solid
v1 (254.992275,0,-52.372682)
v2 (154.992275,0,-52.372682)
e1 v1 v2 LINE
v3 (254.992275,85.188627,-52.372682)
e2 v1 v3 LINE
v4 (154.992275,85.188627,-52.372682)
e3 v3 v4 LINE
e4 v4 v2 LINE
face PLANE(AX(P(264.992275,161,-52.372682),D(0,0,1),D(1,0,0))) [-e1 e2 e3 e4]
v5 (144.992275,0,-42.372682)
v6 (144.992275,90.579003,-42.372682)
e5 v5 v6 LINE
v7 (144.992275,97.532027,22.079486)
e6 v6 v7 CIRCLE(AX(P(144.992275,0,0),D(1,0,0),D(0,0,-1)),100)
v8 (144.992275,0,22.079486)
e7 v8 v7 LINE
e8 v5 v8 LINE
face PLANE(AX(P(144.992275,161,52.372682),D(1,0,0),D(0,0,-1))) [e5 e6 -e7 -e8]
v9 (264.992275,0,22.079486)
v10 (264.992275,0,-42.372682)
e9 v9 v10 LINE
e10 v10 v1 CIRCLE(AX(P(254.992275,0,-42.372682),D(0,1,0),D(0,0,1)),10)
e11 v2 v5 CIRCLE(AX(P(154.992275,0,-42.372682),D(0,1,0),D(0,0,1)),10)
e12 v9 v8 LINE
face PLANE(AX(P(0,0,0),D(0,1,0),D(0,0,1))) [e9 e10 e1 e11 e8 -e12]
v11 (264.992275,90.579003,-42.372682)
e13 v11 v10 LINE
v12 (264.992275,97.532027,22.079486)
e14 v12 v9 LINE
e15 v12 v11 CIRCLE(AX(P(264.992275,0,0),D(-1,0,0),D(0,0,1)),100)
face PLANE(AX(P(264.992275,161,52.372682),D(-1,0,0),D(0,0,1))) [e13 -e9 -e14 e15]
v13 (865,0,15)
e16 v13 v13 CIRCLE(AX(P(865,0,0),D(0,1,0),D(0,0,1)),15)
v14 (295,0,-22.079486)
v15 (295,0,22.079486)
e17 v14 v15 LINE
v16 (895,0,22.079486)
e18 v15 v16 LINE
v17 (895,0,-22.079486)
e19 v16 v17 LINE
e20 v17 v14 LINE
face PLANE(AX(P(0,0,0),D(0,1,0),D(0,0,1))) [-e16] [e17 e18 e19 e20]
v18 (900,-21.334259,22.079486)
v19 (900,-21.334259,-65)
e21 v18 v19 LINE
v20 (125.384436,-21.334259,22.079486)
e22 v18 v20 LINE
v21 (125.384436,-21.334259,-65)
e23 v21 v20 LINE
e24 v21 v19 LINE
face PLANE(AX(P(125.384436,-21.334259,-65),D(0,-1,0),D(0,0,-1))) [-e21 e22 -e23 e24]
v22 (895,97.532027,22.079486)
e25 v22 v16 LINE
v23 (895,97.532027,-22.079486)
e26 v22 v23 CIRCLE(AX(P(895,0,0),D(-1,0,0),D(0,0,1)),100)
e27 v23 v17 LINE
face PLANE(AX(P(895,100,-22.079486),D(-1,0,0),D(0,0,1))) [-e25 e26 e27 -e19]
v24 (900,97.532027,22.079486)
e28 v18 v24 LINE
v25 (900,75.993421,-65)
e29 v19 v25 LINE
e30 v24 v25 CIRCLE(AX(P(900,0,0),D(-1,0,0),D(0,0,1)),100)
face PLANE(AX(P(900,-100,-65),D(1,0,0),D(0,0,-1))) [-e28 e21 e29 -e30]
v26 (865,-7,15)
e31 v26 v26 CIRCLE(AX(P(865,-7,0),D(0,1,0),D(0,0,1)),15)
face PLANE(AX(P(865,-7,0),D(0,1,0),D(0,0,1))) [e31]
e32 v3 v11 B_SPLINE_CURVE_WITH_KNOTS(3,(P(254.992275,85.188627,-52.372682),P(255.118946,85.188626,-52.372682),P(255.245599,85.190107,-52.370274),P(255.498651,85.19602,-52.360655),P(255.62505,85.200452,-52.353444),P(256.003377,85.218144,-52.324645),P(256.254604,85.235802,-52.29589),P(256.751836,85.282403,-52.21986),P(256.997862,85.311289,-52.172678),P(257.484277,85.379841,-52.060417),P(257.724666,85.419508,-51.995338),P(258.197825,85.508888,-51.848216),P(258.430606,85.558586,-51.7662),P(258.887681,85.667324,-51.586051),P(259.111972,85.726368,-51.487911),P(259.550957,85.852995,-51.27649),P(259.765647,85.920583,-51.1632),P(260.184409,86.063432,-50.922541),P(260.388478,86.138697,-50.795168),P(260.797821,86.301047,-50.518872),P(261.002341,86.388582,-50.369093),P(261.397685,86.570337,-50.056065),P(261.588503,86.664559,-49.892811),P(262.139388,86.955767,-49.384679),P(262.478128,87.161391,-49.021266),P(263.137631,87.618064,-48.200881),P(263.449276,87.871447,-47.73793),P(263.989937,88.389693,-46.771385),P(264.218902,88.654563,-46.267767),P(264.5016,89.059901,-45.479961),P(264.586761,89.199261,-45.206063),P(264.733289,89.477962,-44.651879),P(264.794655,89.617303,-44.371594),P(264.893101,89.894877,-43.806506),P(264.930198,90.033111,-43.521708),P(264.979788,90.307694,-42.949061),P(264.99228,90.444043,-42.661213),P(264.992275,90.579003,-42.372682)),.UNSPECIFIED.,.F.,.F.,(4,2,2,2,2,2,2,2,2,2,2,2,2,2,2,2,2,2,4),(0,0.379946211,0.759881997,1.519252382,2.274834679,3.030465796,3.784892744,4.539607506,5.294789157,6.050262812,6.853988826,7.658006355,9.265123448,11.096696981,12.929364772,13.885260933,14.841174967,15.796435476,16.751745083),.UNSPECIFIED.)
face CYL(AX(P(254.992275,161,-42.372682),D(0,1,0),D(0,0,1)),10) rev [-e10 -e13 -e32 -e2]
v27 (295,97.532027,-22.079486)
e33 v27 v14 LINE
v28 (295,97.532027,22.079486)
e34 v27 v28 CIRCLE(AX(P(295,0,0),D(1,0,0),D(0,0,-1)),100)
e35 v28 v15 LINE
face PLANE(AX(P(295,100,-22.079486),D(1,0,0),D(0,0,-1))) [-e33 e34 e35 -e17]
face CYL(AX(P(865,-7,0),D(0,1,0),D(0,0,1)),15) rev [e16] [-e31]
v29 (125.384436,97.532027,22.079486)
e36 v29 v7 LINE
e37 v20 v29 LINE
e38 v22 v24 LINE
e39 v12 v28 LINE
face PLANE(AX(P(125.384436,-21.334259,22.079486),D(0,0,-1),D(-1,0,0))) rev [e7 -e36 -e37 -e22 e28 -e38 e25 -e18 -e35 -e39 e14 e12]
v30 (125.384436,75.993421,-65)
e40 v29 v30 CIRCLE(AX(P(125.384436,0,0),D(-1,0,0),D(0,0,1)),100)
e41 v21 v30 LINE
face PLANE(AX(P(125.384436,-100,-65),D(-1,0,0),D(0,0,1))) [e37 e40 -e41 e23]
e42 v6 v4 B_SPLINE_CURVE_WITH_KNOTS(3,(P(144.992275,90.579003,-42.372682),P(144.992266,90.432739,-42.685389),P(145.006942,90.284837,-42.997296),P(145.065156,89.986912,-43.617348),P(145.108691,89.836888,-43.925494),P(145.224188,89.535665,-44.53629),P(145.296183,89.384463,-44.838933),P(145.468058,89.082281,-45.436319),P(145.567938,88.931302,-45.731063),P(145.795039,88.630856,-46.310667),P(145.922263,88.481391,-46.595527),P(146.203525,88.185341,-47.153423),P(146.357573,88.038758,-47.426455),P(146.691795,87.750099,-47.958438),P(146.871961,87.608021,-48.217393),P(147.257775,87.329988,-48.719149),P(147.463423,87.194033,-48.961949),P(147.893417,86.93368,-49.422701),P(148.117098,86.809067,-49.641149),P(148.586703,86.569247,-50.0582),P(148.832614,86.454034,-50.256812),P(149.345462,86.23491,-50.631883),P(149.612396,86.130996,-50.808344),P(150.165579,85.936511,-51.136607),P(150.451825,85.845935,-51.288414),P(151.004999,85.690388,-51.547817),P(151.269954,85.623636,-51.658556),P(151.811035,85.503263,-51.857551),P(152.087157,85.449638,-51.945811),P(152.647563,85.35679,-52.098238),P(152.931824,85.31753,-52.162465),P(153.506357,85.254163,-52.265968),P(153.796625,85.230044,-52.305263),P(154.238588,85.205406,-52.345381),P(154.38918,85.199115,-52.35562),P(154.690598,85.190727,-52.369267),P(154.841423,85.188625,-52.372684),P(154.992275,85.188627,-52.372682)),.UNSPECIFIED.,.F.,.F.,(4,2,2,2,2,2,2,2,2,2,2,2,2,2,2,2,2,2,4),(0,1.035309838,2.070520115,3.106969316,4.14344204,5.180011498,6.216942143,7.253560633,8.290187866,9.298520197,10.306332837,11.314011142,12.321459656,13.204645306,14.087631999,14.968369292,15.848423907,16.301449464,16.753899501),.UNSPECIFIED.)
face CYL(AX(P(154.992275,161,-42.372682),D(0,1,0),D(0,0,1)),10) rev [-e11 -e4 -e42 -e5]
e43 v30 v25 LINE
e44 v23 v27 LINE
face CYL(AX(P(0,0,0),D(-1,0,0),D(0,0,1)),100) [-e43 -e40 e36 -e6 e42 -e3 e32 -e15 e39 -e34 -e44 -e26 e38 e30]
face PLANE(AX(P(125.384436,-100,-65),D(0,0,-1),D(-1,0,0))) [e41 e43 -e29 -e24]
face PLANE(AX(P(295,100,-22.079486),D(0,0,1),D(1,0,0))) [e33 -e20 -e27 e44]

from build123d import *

# Parameters (mm, degrees)
CUT_EXTRUDE7_DEPTH               = 1010.950493836
CUT_EXTRUDE7_DEPTH_BACK          = 1010.950493836
SKETCH13_W                       = 48.176434887
SKETCH13_H                       = 155.804640487
SKETCH4_W                        = 600
SKETCH4_H                        = 44.158972604
CUT_EXTRUDE2_DEPTH               = 1010.950493836
SKETCH7_W                        = 159.807953253
SKETCH7_H                        = 69.49104999
BOSS_EXTRUDE7_DEPTH              = 5
FILLET5_R                        = 10
F_5_8_0_625_DIAMETER_HOLE1_D     = 15.875
F_5_8_0_625_DIAMETER_HOLE1_DEPTH = 30
F_5_8_0_625_DIAMETER_HOLE1_TIP   = 4.769331164
BOSS_EXTRUDE8_DEPTH              = 10
BOSS_EXTRUDE8_DEPTH_BACK         = 10
SKETCH16_W                       = 57.403477863
SKETCH16_H                       = 23.203595883
SKETCH17_W                       = 38.256761469
SKETCH17_H                       = 12.64819079
BOSS_EXTRUDE9_DEPTH              = 10
SKETCH18_W                       = 120
SKETCH18_H                       = 104.74536306
CUT_EXTRUDE8_DEPTH               = 161
FILLET6_R                        = 10
SKETCH19_R                       = 15
CUT_EXTRUDE9_DEPTH               = 7
CUT_EXTRUDE11_DEPTH              = 1010.950493856
CUT_EXTRUDE11_DEPTH_BACK         = 1010.950493856
SKETCH22_W                       = 1481.455902665
SKETCH22_H                       = 524.99926461
SKETCH22_W_2                     = 774.615564444
SKETCH22_H_2                     = 130
SKETCH23_W                       = 1033.221047575
SKETCH23_H                       = 313.410359552
SKETCH23_W_2                     = 790.959514037
SKETCH23_H_2                     = 163.499719248
CUT_EXTRUDE12_DEPTH              = 915.822387207
CUT_EXTRUDE13_DEPTH              = 908.868382599
CUT_EXTRUDE13_DEPTH_BACK         = 908.868382599
SKETCH24_W                       = 774.615564444
SKETCH24_H                       = 42.920513698


# Read off the part's stored shape, not the designer's step: Revolve1
with BuildPart() as part:
    # Revolve1 outline → Revolve1 (revolve)
    with BuildSketch(Plane.YX):
        with BuildLine():
            Line((0, 1000), (0, 0))
            ThreePointArc((0, 0), (70.710678154, 29.289321917), (100, 100.0000001))
            Line((100, 100.0000001), (100, 899.9999999))
            ThreePointArc((100, 899.9999999), (70.710678154, 970.710678083), (0, 1000))
        make_face()
    revolve(axis=Axis((0, 0, 0), (1, 0, 0)))

    # Sketch13 → Cut-Extrude7 (cut, two sides: drawn at the far end of the back side and taken through both)
    with BuildSketch(Plane(origin=(0, 0, 0), x_dir=(1, 0, 0), z_dir=(0, 1, 0)).offset(-CUT_EXTRUDE7_DEPTH_BACK)):
        with Locations((5.911782557, -3.075091589)):
            Rectangle(SKETCH13_W, SKETCH13_H)
    extrude(amount=CUT_EXTRUDE7_DEPTH + CUT_EXTRUDE7_DEPTH_BACK, mode=Mode.SUBTRACT)

    # Sketch4 → Cut-Extrude2 (cut, through all)
    with BuildSketch(Plane(origin=(0, 0, 0), x_dir=(1, 0, 0), z_dir=(0, 1, 0))):
        with Locations((595, 0)):
            Rectangle(SKETCH4_W, SKETCH4_H)
    extrude(amount=CUT_EXTRUDE2_DEPTH, mode=Mode.SUBTRACT)

    # Sketch7 → Boss-Extrude7 (add)
    with BuildSketch(Plane(origin=(0, 0, 0), x_dir=(1, 0, 0), z_dir=(0, 1, 0))):
        with Locations((745.885521462, -1.405844332)):
            Rectangle(SKETCH7_W, SKETCH7_H)
    extrude(amount=-BOSS_EXTRUDE7_DEPTH)

    # Fillet5
    fillet5_edges = [part.edges().sort_by_distance(p)[0] for p in [
        (30, -71.414284286, 0),
    ]]
    fillet(fillet5_edges, radius=FILLET5_R)

    # 5/8 (0.625) Diameter Hole1
    with Locations(Plane.ZY.offset(-30)):
        with Locations((0, 0)):
            Hole(F_5_8_0_625_DIAMETER_HOLE1_D / 2, depth=F_5_8_0_625_DIAMETER_HOLE1_DEPTH)
            with Locations((0, 0, -(F_5_8_0_625_DIAMETER_HOLE1_DEPTH + F_5_8_0_625_DIAMETER_HOLE1_TIP / 2))):  # 118° drill point
                Cone(0, F_5_8_0_625_DIAMETER_HOLE1_D / 2, F_5_8_0_625_DIAMETER_HOLE1_TIP, mode=Mode.SUBTRACT)

    # Sketch16 → Boss-Extrude8 (add, two sides: drawn at the far end of the back side and taken through both)
    with BuildSketch(Plane.XY.offset(-BOSS_EXTRUDE8_DEPTH_BACK)):
        with Locations((738.294537666, -11.601797942)):
            Rectangle(SKETCH16_W, SKETCH16_H)
    extrude(amount=BOSS_EXTRUDE8_DEPTH + BOSS_EXTRUDE8_DEPTH_BACK)

    # Sketch17 → Boss-Extrude9 (add)
    with BuildSketch(Plane.XY.offset(-22.079486302)):
        with Locations((787.071835847, 6.324095395)):
            Rectangle(SKETCH17_W, SKETCH17_H)
    extrude(amount=-BOSS_EXTRUDE9_DEPTH)

    # Sketch18 → Cut-Extrude8 (cut)
    with BuildSketch(Plane(origin=(0, 0, 0), x_dir=(1, 0, 0), z_dir=(0, 1, 0))):
        with Locations((204.992275313, 0)):
            Rectangle(SKETCH18_W, SKETCH18_H)
    extrude(amount=CUT_EXTRUDE8_DEPTH, mode=Mode.SUBTRACT)

    # Fillet6
    fillet6_edges = [part.edges().sort_by_distance(p)[0] for p in [
        (144.992275313, 42.594313674, -52.37268153),
        (144.992275313, 42.594313674, 52.37268153),
        (264.992275313, 42.594313674, 52.37268153),
        (264.992275313, 42.594313674, -52.37268153),
    ]]
    fillet(fillet6_edges, radius=FILLET6_R)

    # Sketch19 → Cut-Extrude9 (cut)
    with BuildSketch(Plane(origin=(0, 0, 0), x_dir=(1, 0, 0), z_dir=(0, 1, 0))):
        with Locations(Location((865, 0, 0), (0, 0, 270))):
            Circle(SKETCH19_R)
    extrude(amount=-CUT_EXTRUDE9_DEPTH, mode=Mode.SUBTRACT)

    # Sketch22 → Cut-Extrude11 (cut, two sides: drawn at the far end of the back side and taken through both)
    with BuildSketch(Plane(origin=(0, 0, 0), x_dir=(1, 0, 0), z_dir=(0, 1, 0)).offset(-CUT_EXTRUDE11_DEPTH_BACK)):
        with Locations((406.155110175, 0)):
            Rectangle(SKETCH22_W, SKETCH22_H)
        with Locations((512.692217778, 0)):
            Rectangle(SKETCH22_W_2, SKETCH22_H_2, mode=Mode.SUBTRACT)
    extrude(amount=CUT_EXTRUDE11_DEPTH + CUT_EXTRUDE11_DEPTH_BACK, mode=Mode.SUBTRACT)

    # Sketch23 → Cut-Extrude12 (cut, through all)
    with BuildSketch(Plane.XY.offset(65)):
        with Locations((481.89787613, -1.932796335)):
            Rectangle(SKETCH23_W, SKETCH23_H)
        with Locations((520.864192575, 60.415600646)):
            Rectangle(SKETCH23_W_2, SKETCH23_H_2, mode=Mode.SUBTRACT)
    extrude(amount=-CUT_EXTRUDE12_DEPTH, mode=Mode.SUBTRACT)

    # Sketch24 → Cut-Extrude13 (cut, two sides: drawn at the far end of the back side and taken through both)
    with BuildSketch(Plane(origin=(0, 0, 0), x_dir=(1, 0, 0), z_dir=(0, 1, 0)).offset(-CUT_EXTRUDE13_DEPTH_BACK)):
        with Locations((512.692217778, -43.539743151)):
            Rectangle(SKETCH24_W, SKETCH24_H)
    extrude(amount=CUT_EXTRUDE13_DEPTH + CUT_EXTRUDE13_DEPTH_BACK, mode=Mode.SUBTRACT)


solid = part.part
